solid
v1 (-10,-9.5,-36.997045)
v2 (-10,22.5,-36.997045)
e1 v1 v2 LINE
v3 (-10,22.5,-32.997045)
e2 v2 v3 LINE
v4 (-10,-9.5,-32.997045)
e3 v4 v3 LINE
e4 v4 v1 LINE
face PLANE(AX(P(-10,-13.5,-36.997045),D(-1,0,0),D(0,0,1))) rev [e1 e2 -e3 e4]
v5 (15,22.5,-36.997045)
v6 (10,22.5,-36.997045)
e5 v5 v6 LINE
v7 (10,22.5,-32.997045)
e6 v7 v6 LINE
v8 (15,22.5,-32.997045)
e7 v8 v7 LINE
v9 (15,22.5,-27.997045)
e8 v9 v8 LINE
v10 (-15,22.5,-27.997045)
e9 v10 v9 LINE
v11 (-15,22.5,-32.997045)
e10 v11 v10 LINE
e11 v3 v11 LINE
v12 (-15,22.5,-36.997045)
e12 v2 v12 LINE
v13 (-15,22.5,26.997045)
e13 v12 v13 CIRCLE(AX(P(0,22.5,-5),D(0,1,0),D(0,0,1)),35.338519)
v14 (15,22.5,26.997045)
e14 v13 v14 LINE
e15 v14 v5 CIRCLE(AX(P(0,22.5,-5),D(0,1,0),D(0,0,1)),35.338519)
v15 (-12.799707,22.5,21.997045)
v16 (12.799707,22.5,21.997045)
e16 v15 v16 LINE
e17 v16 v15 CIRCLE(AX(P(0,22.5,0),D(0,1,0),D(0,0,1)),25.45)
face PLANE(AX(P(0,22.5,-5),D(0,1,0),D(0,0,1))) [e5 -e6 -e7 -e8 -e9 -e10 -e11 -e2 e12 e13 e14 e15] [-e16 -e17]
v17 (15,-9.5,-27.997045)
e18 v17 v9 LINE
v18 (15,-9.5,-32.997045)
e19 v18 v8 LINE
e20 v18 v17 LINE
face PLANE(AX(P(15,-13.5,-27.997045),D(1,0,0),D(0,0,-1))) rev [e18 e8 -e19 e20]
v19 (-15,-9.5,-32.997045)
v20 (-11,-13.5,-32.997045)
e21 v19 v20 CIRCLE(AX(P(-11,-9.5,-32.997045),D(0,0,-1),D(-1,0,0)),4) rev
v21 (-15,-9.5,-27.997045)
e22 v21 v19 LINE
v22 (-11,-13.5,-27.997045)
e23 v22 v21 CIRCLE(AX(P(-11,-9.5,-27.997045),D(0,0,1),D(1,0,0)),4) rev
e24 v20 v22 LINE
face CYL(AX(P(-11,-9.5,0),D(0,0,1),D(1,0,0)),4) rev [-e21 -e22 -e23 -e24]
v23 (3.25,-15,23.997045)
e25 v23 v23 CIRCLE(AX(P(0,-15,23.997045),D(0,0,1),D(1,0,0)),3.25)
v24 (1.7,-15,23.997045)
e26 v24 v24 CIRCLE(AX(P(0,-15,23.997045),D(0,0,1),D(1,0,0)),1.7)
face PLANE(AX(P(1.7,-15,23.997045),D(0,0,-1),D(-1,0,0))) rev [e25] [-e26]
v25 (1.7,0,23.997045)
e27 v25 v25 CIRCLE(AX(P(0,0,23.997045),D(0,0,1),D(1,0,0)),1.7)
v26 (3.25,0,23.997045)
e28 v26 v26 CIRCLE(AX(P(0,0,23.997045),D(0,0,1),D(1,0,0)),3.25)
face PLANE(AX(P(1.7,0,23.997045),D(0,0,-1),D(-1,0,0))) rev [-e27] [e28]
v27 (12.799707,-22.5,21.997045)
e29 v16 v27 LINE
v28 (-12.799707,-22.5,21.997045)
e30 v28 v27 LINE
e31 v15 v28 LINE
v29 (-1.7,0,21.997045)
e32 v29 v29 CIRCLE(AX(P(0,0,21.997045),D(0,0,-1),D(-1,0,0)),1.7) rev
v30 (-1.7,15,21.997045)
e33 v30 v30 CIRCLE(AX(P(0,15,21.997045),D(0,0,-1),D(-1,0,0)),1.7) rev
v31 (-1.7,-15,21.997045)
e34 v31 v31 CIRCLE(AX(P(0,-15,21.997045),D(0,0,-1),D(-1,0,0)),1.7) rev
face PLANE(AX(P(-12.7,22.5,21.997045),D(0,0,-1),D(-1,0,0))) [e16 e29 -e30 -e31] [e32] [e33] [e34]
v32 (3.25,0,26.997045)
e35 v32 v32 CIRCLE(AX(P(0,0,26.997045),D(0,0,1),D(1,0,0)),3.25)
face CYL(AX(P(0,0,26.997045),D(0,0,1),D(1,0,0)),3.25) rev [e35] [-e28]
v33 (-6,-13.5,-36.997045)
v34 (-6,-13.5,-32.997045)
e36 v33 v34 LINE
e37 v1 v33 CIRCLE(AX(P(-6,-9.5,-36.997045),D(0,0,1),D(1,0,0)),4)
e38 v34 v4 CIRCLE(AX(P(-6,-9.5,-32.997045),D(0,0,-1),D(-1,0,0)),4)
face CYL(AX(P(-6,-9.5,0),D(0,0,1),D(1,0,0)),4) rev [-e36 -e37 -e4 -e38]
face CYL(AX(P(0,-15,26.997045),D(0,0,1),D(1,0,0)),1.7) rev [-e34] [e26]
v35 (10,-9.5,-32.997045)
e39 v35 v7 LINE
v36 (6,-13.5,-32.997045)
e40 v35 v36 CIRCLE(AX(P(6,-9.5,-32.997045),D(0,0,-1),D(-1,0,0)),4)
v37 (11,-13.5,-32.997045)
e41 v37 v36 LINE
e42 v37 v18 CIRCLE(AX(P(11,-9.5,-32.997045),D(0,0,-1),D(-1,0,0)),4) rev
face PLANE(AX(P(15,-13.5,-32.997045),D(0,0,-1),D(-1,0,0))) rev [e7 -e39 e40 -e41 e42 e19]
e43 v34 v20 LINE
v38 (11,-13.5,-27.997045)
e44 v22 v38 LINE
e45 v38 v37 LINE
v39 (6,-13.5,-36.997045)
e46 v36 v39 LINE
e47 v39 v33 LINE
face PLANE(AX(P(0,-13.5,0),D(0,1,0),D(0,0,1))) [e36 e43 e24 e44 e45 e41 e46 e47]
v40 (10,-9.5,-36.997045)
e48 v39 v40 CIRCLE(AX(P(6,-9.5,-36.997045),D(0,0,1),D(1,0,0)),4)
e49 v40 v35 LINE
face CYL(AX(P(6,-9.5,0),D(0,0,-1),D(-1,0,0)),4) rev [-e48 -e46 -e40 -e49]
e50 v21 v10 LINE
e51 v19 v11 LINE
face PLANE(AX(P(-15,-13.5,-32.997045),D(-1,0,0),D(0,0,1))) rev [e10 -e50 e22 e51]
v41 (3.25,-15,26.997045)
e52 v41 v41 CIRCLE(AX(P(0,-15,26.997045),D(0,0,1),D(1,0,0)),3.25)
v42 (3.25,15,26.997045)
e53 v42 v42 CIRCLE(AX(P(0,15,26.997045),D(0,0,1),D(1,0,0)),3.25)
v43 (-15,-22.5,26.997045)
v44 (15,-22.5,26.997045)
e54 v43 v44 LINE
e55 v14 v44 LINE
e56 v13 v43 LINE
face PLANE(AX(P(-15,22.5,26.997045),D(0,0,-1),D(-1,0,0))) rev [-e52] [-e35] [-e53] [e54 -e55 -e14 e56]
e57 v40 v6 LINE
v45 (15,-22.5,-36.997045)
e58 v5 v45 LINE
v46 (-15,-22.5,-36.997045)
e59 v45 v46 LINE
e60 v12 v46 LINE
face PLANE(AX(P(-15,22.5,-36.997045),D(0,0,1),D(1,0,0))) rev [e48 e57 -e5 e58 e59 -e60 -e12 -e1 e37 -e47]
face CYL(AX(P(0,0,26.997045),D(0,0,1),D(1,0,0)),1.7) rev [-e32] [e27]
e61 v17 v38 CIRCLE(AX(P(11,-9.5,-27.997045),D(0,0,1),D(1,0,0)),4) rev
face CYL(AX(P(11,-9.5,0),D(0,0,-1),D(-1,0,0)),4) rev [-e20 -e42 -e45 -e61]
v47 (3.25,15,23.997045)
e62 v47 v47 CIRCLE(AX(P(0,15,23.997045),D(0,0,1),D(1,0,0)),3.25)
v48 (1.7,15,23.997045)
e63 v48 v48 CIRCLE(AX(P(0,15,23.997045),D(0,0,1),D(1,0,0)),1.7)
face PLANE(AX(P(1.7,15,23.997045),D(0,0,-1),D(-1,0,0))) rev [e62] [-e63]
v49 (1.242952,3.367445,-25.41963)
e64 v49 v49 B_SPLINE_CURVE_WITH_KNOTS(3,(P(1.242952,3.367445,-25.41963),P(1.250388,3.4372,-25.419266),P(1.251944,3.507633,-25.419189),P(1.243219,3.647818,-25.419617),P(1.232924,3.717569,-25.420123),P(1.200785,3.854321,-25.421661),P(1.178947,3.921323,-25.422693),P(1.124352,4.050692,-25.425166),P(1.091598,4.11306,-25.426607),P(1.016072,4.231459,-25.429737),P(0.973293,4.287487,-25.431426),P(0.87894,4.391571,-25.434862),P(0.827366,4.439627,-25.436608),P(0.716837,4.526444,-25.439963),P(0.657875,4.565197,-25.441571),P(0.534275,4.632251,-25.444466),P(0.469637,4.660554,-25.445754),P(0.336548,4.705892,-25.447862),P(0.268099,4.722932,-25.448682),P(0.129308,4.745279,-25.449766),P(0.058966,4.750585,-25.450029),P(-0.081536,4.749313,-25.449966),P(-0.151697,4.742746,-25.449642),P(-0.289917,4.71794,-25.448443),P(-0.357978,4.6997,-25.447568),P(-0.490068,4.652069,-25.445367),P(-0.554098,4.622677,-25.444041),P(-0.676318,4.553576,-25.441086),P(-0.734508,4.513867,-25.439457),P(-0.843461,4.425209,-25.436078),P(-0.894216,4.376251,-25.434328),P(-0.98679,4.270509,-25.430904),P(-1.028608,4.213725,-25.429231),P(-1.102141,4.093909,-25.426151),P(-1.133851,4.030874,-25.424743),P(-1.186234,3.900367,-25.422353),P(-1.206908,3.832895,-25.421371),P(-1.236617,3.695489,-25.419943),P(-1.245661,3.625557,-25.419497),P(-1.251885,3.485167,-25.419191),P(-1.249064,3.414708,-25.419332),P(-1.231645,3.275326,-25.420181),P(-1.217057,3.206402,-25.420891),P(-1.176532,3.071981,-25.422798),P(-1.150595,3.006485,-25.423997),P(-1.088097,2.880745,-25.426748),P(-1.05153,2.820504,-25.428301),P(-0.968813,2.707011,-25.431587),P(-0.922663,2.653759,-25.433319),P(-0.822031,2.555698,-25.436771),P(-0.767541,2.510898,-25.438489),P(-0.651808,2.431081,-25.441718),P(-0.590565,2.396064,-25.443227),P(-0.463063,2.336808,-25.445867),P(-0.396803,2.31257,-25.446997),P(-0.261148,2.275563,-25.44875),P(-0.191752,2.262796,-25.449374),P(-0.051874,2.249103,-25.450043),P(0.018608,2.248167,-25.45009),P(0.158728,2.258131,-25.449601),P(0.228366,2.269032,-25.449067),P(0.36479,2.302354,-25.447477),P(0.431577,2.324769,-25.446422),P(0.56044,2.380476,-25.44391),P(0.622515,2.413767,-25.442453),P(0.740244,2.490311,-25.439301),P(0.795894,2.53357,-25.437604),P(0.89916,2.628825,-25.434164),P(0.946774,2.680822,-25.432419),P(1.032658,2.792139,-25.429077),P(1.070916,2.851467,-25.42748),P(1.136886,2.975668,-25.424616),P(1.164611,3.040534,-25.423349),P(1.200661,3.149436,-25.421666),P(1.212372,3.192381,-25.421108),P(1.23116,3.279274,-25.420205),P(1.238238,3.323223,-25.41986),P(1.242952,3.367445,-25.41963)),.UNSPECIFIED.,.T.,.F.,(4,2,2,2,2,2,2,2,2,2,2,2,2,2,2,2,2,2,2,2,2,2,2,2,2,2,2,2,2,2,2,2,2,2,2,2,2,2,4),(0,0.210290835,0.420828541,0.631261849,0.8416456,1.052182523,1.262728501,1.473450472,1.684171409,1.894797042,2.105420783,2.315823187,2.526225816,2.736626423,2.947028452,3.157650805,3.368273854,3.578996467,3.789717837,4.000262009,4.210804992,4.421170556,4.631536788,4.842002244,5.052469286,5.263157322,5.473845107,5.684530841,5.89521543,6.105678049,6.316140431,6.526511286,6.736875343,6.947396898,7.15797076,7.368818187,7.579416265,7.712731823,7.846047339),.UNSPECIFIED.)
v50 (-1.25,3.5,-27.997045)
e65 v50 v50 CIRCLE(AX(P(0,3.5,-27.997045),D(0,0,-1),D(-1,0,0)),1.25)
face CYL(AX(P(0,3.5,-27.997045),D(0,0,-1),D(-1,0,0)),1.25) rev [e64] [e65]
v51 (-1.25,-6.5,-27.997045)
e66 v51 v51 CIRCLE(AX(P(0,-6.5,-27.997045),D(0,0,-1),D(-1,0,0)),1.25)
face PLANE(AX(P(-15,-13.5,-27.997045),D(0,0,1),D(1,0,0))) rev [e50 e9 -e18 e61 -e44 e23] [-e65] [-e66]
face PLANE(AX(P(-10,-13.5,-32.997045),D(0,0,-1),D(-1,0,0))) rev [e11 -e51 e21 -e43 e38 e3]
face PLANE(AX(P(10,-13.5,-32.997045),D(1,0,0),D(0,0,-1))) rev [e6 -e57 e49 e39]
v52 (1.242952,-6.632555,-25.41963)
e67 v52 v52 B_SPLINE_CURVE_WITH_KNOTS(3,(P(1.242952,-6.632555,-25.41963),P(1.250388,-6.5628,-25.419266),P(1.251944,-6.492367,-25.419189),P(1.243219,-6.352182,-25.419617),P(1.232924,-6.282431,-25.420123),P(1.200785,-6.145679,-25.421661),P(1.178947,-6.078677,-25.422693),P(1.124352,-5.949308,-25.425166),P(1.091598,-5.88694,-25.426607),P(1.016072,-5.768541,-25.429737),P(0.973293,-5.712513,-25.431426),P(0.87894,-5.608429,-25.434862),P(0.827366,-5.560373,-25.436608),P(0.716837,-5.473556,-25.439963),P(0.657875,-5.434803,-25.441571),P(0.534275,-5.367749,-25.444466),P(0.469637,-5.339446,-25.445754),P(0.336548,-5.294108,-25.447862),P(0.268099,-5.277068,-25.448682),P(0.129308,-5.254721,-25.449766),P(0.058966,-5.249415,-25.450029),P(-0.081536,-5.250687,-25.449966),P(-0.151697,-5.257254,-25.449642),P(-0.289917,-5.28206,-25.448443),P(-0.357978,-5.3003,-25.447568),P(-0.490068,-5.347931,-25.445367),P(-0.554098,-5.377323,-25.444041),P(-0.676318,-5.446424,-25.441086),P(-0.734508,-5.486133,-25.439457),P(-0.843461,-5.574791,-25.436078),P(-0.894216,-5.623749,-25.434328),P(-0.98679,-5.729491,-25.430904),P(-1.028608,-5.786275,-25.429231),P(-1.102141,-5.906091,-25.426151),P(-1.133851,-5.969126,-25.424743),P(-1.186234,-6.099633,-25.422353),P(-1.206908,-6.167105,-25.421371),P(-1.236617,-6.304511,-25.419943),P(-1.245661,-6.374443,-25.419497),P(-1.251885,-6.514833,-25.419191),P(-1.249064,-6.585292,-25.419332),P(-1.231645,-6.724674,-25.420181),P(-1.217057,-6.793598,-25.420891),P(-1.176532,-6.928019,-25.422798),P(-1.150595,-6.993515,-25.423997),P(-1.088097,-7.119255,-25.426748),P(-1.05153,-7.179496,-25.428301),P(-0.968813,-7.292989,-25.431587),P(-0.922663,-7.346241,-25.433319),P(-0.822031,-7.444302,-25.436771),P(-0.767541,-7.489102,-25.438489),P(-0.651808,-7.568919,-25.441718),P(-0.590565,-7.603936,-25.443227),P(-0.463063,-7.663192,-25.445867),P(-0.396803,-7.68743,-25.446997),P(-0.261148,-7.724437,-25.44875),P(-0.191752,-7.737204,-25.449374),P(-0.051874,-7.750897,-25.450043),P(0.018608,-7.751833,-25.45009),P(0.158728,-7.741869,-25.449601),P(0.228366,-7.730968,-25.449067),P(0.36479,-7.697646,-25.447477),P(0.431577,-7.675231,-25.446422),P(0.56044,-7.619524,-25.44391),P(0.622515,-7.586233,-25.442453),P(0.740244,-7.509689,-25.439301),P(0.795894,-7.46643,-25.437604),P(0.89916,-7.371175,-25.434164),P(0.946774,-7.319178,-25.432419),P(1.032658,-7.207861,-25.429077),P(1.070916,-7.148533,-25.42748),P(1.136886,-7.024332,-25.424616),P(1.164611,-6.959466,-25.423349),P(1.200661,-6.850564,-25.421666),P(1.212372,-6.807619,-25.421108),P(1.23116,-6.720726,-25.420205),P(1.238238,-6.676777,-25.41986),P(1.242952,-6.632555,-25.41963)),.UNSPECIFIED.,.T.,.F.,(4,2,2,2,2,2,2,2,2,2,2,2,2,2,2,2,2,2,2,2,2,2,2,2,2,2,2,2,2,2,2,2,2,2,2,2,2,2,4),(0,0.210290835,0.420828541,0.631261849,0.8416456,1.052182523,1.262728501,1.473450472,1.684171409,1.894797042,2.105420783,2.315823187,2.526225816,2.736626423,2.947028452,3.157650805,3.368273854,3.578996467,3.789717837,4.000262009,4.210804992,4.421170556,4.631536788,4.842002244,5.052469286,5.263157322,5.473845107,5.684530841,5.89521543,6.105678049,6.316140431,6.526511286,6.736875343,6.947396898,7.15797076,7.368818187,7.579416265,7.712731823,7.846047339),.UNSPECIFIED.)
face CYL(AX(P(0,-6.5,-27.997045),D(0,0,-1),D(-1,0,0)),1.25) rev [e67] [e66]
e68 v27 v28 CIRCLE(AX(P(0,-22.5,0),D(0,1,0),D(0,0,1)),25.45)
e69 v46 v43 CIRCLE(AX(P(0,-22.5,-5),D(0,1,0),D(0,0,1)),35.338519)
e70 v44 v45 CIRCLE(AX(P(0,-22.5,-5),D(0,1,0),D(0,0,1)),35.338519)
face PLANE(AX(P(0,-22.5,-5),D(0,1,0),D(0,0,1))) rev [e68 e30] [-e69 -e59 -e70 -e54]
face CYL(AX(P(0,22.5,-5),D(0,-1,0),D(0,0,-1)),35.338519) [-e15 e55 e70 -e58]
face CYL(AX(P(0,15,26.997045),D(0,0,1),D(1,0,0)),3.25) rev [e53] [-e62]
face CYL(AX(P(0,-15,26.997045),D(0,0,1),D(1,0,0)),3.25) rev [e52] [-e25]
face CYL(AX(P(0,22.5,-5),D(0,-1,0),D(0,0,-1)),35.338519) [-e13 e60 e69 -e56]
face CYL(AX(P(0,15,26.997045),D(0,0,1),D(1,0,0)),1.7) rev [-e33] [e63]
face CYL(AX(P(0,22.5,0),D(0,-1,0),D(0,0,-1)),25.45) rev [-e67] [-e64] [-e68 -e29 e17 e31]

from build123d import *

# Parameters (mm, degrees)
BOSS_EXTRUDE1_DEPTH            = 22.5
CUT_EXTRUDE1_DEPTH             = 36
CBORE_FOR_M3_SHCS1_D           = 3.4
CBORE_FOR_M3_SHCS1_DEPTH       = 5
CBORE_FOR_M3_SHCS1_CBORE_D     = 6.5
CBORE_FOR_M3_SHCS1_CBORE_DEPTH = 3
CBORE_FOR_M3_SHCS1_TIP         = 1.021463052
M3X0_5_TAPPED_HOLE1_D          = 2.5
M3X0_5_TAPPED_HOLE1_DEPTH      = 25.54449211
M3X0_5_TAPPED_HOLE1_TIP        = 0.751075774
FILLET2_R                      = 4
TOLERANCING_START              = -22.5
TOLERANCING_DEPTH              = 45


# Read off the part's stored shape, not the designer's step: Tolerancing
with BuildPart() as part:
    # Sketch1 → Boss-Extrude1 (new, symmetric)
    with BuildSketch(Plane(origin=(0, 0, 0), x_dir=(1, 0, 0), z_dir=(0, 1, 0))):
        with BuildLine():
            Line((-15, -26.997045256), (15, -26.997045256))
            ThreePointArc((15, -26.997045256), (35.338518717, 5), (15, 36.997045256))
            Line((15, 36.997045256), (-15, 36.997045256))
            ThreePointArc((-15, 36.997045256), (-35.338518717, 5), (-15, -26.997045256))
        make_face()
        with BuildLine():
            Line((-12.7, -21.997045256), (12.7, -21.997045256))
            ThreePointArc((12.7, -21.997045256), (0, 25.4), (-12.7, -21.997045256))
        make_face(mode=Mode.SUBTRACT)
    extrude(amount=BOSS_EXTRUDE1_DEPTH, both=True)

    # Sketch4 → Cut-Extrude1 (cut)
    with BuildSketch(Plane(origin=(0, 22.5, 0), x_dir=(1, 0, 0), z_dir=(0, 1, 0))):
        Polygon((-10, 36.997045256), (-10, 32.997045256), (-15, 32.997045256), (-15, 27.997045256), (15, 27.997045256), (15, 32.997045256), (10, 32.997045256), (10, 36.997045256), align=None)
    extrude(amount=-CUT_EXTRUDE1_DEPTH, mode=Mode.SUBTRACT)

    # CBORE for M3 SHCS1
    with Locations(Plane.XY.offset(26.997045256)):
        with Locations((0, 0), (0, 15), (0, -15)):
            CounterBoreHole(CBORE_FOR_M3_SHCS1_D / 2, CBORE_FOR_M3_SHCS1_CBORE_D / 2, CBORE_FOR_M3_SHCS1_CBORE_DEPTH, depth=CBORE_FOR_M3_SHCS1_DEPTH)
            with Locations((0, 0, -(CBORE_FOR_M3_SHCS1_DEPTH + CBORE_FOR_M3_SHCS1_TIP / 2))):  # 118° drill point
                Cone(0, CBORE_FOR_M3_SHCS1_D / 2, CBORE_FOR_M3_SHCS1_TIP, mode=Mode.SUBTRACT)

    # M3x0.5 Tapped Hole1
    with Locations(Plane(origin=(0, 0, -27.997045256), x_dir=(-1, 0, 0), z_dir=(0, 0, -1))):
        with Locations((0, 3.5), (0, -6.5)):
            Hole(M3X0_5_TAPPED_HOLE1_D / 2, depth=M3X0_5_TAPPED_HOLE1_DEPTH)
            with Locations((0, 0, -(M3X0_5_TAPPED_HOLE1_DEPTH + M3X0_5_TAPPED_HOLE1_TIP / 2))):  # 118° drill point
                Cone(0, M3X0_5_TAPPED_HOLE1_D / 2, M3X0_5_TAPPED_HOLE1_TIP, mode=Mode.SUBTRACT)

    # Fillet2
    fillet2_edges = [part.edges().sort_by_distance(p)[0] for p in [
        (10, -13.5, -34.997045256),
        (15, -13.5, -30.497045256),
        (-15, -13.5, -30.497045256),
        (-10, -13.5, -34.997045256),
    ]]
    fillet(fillet2_edges, radius=FILLET2_R)

    # Tolerancing outline → Tolerancing (cut)
    with BuildSketch(Plane(origin=(0, 0, 0), x_dir=(1, 0, 0), z_dir=(0, 1, 0)).offset(TOLERANCING_START)):
        with BuildLine():
            ThreePointArc((12.799707028, -21.997045256), (0, 25.45), (-12.799707028, -21.997045256))
            Line((-12.799707028, -21.997045256), (-12.7, -21.997045256))
            ThreePointArc((-12.7, -21.997045256), (0, 25.4), (12.7, -21.997045256))
            Line((12.7, -21.997045256), (12.799707028, -21.997045256))
        make_face()
    extrude(amount=TOLERANCING_DEPTH, mode=Mode.SUBTRACT)


solid = part.part
